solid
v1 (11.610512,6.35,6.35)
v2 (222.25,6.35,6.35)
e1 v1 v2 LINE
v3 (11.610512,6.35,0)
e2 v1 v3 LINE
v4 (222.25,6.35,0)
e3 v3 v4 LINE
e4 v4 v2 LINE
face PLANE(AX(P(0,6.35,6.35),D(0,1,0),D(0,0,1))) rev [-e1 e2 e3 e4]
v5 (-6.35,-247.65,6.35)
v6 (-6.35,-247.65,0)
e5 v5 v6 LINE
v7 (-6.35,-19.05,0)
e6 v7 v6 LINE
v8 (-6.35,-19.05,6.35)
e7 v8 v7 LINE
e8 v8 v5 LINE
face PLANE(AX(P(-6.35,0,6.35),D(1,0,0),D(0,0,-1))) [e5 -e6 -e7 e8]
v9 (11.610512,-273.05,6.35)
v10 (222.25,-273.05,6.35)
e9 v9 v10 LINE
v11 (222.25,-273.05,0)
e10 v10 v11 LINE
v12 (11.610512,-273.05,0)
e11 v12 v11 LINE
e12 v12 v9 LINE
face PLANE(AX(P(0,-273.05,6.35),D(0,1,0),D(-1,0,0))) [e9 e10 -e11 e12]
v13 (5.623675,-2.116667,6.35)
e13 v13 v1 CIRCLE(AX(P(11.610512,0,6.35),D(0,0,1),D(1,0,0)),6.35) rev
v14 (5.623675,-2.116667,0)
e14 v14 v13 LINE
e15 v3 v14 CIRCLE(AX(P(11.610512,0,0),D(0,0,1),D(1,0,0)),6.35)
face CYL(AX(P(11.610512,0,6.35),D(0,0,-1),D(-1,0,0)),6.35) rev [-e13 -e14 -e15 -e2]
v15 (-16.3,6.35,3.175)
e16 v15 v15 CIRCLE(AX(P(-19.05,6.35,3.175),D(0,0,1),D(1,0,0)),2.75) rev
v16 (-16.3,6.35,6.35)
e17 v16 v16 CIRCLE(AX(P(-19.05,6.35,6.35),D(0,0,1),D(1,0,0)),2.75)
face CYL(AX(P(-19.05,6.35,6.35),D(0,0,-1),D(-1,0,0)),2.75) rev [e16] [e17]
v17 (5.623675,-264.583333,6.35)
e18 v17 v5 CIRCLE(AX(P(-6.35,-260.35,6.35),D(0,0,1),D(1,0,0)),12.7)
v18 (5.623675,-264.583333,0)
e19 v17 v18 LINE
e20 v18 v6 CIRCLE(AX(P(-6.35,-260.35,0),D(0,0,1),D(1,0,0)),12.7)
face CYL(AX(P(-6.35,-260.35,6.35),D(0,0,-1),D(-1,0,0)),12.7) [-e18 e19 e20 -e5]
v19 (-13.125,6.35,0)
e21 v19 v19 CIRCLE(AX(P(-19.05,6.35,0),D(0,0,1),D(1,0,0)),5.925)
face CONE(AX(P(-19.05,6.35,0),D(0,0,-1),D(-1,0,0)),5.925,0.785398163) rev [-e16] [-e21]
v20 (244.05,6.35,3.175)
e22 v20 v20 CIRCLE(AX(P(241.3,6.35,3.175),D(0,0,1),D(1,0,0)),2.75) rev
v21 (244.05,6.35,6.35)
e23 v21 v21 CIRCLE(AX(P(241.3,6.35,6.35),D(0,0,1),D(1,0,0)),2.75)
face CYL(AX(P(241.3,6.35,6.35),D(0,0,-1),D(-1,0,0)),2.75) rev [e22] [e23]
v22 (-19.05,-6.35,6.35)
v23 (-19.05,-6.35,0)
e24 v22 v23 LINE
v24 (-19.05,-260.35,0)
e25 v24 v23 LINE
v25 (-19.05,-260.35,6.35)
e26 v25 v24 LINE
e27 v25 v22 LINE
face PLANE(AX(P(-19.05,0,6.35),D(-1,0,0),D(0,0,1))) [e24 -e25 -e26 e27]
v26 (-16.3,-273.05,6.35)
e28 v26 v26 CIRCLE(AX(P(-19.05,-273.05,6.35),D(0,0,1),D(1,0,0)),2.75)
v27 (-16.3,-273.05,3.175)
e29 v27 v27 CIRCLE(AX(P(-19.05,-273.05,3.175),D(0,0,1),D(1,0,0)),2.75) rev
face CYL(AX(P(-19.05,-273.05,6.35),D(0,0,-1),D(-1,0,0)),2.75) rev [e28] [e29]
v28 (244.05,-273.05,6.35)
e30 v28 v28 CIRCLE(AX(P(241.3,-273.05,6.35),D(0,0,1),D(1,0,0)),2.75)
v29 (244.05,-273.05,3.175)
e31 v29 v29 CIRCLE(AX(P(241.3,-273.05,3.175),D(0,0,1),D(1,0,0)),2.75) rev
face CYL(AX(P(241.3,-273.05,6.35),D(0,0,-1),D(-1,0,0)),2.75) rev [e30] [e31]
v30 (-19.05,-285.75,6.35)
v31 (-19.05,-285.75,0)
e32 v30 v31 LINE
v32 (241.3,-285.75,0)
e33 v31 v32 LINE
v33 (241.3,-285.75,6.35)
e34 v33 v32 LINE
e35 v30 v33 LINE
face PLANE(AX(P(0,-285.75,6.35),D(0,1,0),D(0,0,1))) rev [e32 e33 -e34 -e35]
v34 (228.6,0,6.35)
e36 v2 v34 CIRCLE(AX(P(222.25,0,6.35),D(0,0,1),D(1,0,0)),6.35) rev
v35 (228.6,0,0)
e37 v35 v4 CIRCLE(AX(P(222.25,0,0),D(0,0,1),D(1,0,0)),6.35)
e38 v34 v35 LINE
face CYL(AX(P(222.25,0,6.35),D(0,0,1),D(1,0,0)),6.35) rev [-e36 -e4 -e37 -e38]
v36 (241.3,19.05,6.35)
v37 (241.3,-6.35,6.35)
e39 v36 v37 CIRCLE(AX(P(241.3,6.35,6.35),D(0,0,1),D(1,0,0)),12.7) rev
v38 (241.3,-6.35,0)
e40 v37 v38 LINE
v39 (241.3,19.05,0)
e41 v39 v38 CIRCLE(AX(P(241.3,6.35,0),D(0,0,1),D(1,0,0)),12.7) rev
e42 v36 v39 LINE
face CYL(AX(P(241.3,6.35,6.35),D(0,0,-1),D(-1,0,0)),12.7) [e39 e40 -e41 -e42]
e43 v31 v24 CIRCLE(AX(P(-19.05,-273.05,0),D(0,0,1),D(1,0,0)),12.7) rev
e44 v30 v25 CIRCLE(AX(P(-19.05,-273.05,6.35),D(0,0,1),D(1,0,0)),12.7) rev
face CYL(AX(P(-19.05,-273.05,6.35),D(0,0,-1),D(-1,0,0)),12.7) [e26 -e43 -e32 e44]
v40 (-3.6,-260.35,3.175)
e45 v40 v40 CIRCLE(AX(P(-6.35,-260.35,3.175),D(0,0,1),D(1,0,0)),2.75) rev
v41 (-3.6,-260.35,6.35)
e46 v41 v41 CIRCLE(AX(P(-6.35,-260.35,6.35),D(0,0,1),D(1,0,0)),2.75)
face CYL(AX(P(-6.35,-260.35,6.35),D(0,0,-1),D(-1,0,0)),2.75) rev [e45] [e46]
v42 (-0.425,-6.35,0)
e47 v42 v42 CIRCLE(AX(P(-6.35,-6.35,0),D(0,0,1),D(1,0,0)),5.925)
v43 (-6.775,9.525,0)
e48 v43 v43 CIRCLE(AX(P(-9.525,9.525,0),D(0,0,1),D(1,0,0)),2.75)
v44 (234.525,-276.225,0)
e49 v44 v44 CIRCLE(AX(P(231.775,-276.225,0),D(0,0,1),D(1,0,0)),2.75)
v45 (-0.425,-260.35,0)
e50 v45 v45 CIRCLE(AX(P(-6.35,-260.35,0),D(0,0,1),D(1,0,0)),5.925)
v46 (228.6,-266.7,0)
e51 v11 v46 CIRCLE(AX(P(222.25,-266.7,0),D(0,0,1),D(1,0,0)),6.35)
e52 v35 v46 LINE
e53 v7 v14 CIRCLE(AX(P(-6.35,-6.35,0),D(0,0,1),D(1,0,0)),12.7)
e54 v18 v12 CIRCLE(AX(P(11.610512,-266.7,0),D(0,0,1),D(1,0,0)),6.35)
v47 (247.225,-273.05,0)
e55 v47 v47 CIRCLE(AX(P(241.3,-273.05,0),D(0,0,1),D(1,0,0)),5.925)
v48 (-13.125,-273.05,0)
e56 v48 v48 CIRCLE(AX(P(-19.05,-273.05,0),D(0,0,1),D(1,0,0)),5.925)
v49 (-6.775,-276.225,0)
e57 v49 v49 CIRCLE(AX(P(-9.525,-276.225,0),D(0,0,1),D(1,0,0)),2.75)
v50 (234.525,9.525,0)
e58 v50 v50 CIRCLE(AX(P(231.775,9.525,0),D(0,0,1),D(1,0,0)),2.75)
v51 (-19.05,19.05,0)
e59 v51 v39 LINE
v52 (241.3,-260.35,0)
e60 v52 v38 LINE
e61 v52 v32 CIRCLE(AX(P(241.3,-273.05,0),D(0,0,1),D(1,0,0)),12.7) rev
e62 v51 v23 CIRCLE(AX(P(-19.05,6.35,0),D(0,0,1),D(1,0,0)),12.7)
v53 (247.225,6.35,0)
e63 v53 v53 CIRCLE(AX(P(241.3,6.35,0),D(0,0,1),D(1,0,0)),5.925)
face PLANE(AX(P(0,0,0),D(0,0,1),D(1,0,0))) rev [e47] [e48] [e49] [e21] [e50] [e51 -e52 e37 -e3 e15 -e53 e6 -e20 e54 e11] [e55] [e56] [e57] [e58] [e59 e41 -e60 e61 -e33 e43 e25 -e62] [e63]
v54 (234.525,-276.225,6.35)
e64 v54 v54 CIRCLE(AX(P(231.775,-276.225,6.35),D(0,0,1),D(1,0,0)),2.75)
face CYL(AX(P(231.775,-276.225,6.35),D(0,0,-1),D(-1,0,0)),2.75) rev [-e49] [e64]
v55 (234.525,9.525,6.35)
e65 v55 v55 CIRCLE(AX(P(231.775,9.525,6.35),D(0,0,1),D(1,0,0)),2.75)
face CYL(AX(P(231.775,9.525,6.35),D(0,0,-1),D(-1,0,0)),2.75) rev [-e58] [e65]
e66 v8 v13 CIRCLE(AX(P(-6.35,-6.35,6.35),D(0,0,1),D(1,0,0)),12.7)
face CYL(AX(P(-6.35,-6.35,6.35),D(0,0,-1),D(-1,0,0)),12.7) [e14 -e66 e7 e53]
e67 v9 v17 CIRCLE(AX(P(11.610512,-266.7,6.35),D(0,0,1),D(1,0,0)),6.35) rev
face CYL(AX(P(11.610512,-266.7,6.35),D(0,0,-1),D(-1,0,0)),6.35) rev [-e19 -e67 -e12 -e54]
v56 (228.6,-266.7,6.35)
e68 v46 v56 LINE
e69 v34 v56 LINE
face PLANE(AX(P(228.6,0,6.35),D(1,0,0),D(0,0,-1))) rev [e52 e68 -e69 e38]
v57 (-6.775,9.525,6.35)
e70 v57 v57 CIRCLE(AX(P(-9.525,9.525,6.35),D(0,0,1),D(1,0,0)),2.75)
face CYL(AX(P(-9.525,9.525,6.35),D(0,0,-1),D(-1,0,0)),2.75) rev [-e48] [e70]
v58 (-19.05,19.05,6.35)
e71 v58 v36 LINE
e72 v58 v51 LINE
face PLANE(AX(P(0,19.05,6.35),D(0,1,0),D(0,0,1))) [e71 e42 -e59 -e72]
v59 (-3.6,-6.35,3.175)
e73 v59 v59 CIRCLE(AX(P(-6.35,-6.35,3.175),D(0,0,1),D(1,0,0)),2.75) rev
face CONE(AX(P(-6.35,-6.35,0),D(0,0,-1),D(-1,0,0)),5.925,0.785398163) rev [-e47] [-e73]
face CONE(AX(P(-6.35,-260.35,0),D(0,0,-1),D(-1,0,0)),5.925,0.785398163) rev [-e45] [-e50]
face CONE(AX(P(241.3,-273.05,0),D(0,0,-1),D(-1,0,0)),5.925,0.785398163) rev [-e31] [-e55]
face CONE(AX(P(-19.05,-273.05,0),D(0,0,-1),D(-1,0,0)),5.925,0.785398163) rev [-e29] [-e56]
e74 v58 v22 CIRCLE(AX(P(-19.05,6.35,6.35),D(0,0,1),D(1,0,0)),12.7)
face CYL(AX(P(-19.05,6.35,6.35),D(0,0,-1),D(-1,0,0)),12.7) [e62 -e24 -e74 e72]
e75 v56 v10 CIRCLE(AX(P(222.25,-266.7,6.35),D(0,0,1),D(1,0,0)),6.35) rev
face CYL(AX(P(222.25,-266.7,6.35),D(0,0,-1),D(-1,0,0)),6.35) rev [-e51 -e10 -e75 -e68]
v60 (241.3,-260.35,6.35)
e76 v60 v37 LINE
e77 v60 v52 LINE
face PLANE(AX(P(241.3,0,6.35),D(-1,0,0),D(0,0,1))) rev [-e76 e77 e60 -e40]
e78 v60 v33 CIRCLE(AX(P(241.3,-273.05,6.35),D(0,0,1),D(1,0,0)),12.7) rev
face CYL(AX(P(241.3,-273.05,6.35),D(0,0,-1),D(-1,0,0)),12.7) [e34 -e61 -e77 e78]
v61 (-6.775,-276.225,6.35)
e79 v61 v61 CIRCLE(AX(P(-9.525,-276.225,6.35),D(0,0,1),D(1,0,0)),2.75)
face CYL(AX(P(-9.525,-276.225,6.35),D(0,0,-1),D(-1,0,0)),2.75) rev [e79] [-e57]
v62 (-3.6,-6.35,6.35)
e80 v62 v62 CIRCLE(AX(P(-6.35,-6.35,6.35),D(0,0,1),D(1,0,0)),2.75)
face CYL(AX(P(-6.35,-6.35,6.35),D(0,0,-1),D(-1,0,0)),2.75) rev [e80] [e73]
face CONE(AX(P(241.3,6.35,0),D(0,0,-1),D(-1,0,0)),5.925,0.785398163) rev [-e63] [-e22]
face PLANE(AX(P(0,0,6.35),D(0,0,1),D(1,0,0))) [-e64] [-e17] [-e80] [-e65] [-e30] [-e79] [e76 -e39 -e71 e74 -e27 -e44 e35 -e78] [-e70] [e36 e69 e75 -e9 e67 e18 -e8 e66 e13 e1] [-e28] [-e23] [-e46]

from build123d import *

# Parameters (mm, degrees)
SKETCH1_R           = 2.75
BOSS_EXTRUDE1_DEPTH = 6.35
FILLET1_R           = 6.35
CHAMFER1_SIZE       = 3.175


with BuildPart() as part:
    # Sketch1 → Boss-Extrude1 (new body)
    with BuildSketch(Plane.XY):
        with BuildLine():
            ThreePointArc((-19.05, 19.05), (-31.75, 6.35), (-19.05, -6.35))
            Line((-19.05, -6.35), (-19.05, -260.35))
            ThreePointArc((-19.05, -260.35), (-31.75, -273.05), (-19.05, -285.75))
            Line((-19.05, -285.75), (241.3, -285.75))
            ThreePointArc((241.3, -285.75), (254, -273.05), (241.3, -260.35))
            Line((241.3, -260.35), (241.3, -6.35))
            ThreePointArc((241.3, -6.35), (254, 6.35), (241.3, 19.05))
            Line((241.3, 19.05), (-19.05, 19.05))
        make_face()
        with Locations((241.3, 6.35)):
            Circle(SKETCH1_R, mode=Mode.SUBTRACT)
        with Locations((-19.05, -273.05)):
            Circle(SKETCH1_R, mode=Mode.SUBTRACT)
        with Locations((-9.525, -276.225)):
            Circle(SKETCH1_R, mode=Mode.SUBTRACT)
        with Locations((231.775, -276.225)):
            Circle(SKETCH1_R, mode=Mode.SUBTRACT)
        with Locations((241.3, -273.05)):
            Circle(SKETCH1_R, mode=Mode.SUBTRACT)
        with BuildLine():
            Line((-6.35, -247.65), (-6.35, -19.05))
            ThreePointArc((-6.35, -19.05), (6.35, -6.35), (-6.35, 6.35))
            Line((-6.35, 6.35), (228.6, 6.35))
            Line((228.6, 6.35), (228.6, -273.05))
            Line((228.6, -273.05), (-6.35, -273.05))
            ThreePointArc((-6.35, -273.05), (6.35, -260.35), (-6.35, -247.65))
        make_face(mode=Mode.SUBTRACT)
        with Locations((-6.35, -6.35)):
            Circle(SKETCH1_R, mode=Mode.SUBTRACT)
        with Locations((-6.35, -260.35)):
            Circle(SKETCH1_R, mode=Mode.SUBTRACT)
        with Locations((-19.05, 6.35)):
            Circle(SKETCH1_R, mode=Mode.SUBTRACT)
        with Locations((-9.525, 9.525)):
            Circle(SKETCH1_R, mode=Mode.SUBTRACT)
        with Locations((231.775, 9.525)):
            Circle(SKETCH1_R, mode=Mode.SUBTRACT)
    extrude(amount=BOSS_EXTRUDE1_DEPTH)

    # Fillet1
    fillet1_edges = [part.edges().sort_by_distance(p)[0] for p in [
        (228.6, -273.05, 3.175),
        (228.6, 6.35, 3.175),
        (-6.35, 6.35, 3.175),
    ]]
    fillet(fillet1_edges, radius=FILLET1_R)
    fillet1_2_edges = [part.edges().sort_by_distance(p)[0] for p in [
        (-6.35, -273.05, 3.175),
    ]]
    fillet(fillet1_2_edges, radius=FILLET1_R)

    # Chamfer1
    chamfer1_edges = [part.edges().sort_by_distance(p)[0] for p in [
        (-21.8, 6.35, 0),
        (-21.8, -273.05, 0),
        (238.55, 6.35, 0),
        (238.55, -273.05, 0),
        (-9.1, -260.35, 0),
        (-9.1, -6.35, 0),
    ]]
    chamfer(chamfer1_edges, length=CHAMFER1_SIZE)


solid = part.part
